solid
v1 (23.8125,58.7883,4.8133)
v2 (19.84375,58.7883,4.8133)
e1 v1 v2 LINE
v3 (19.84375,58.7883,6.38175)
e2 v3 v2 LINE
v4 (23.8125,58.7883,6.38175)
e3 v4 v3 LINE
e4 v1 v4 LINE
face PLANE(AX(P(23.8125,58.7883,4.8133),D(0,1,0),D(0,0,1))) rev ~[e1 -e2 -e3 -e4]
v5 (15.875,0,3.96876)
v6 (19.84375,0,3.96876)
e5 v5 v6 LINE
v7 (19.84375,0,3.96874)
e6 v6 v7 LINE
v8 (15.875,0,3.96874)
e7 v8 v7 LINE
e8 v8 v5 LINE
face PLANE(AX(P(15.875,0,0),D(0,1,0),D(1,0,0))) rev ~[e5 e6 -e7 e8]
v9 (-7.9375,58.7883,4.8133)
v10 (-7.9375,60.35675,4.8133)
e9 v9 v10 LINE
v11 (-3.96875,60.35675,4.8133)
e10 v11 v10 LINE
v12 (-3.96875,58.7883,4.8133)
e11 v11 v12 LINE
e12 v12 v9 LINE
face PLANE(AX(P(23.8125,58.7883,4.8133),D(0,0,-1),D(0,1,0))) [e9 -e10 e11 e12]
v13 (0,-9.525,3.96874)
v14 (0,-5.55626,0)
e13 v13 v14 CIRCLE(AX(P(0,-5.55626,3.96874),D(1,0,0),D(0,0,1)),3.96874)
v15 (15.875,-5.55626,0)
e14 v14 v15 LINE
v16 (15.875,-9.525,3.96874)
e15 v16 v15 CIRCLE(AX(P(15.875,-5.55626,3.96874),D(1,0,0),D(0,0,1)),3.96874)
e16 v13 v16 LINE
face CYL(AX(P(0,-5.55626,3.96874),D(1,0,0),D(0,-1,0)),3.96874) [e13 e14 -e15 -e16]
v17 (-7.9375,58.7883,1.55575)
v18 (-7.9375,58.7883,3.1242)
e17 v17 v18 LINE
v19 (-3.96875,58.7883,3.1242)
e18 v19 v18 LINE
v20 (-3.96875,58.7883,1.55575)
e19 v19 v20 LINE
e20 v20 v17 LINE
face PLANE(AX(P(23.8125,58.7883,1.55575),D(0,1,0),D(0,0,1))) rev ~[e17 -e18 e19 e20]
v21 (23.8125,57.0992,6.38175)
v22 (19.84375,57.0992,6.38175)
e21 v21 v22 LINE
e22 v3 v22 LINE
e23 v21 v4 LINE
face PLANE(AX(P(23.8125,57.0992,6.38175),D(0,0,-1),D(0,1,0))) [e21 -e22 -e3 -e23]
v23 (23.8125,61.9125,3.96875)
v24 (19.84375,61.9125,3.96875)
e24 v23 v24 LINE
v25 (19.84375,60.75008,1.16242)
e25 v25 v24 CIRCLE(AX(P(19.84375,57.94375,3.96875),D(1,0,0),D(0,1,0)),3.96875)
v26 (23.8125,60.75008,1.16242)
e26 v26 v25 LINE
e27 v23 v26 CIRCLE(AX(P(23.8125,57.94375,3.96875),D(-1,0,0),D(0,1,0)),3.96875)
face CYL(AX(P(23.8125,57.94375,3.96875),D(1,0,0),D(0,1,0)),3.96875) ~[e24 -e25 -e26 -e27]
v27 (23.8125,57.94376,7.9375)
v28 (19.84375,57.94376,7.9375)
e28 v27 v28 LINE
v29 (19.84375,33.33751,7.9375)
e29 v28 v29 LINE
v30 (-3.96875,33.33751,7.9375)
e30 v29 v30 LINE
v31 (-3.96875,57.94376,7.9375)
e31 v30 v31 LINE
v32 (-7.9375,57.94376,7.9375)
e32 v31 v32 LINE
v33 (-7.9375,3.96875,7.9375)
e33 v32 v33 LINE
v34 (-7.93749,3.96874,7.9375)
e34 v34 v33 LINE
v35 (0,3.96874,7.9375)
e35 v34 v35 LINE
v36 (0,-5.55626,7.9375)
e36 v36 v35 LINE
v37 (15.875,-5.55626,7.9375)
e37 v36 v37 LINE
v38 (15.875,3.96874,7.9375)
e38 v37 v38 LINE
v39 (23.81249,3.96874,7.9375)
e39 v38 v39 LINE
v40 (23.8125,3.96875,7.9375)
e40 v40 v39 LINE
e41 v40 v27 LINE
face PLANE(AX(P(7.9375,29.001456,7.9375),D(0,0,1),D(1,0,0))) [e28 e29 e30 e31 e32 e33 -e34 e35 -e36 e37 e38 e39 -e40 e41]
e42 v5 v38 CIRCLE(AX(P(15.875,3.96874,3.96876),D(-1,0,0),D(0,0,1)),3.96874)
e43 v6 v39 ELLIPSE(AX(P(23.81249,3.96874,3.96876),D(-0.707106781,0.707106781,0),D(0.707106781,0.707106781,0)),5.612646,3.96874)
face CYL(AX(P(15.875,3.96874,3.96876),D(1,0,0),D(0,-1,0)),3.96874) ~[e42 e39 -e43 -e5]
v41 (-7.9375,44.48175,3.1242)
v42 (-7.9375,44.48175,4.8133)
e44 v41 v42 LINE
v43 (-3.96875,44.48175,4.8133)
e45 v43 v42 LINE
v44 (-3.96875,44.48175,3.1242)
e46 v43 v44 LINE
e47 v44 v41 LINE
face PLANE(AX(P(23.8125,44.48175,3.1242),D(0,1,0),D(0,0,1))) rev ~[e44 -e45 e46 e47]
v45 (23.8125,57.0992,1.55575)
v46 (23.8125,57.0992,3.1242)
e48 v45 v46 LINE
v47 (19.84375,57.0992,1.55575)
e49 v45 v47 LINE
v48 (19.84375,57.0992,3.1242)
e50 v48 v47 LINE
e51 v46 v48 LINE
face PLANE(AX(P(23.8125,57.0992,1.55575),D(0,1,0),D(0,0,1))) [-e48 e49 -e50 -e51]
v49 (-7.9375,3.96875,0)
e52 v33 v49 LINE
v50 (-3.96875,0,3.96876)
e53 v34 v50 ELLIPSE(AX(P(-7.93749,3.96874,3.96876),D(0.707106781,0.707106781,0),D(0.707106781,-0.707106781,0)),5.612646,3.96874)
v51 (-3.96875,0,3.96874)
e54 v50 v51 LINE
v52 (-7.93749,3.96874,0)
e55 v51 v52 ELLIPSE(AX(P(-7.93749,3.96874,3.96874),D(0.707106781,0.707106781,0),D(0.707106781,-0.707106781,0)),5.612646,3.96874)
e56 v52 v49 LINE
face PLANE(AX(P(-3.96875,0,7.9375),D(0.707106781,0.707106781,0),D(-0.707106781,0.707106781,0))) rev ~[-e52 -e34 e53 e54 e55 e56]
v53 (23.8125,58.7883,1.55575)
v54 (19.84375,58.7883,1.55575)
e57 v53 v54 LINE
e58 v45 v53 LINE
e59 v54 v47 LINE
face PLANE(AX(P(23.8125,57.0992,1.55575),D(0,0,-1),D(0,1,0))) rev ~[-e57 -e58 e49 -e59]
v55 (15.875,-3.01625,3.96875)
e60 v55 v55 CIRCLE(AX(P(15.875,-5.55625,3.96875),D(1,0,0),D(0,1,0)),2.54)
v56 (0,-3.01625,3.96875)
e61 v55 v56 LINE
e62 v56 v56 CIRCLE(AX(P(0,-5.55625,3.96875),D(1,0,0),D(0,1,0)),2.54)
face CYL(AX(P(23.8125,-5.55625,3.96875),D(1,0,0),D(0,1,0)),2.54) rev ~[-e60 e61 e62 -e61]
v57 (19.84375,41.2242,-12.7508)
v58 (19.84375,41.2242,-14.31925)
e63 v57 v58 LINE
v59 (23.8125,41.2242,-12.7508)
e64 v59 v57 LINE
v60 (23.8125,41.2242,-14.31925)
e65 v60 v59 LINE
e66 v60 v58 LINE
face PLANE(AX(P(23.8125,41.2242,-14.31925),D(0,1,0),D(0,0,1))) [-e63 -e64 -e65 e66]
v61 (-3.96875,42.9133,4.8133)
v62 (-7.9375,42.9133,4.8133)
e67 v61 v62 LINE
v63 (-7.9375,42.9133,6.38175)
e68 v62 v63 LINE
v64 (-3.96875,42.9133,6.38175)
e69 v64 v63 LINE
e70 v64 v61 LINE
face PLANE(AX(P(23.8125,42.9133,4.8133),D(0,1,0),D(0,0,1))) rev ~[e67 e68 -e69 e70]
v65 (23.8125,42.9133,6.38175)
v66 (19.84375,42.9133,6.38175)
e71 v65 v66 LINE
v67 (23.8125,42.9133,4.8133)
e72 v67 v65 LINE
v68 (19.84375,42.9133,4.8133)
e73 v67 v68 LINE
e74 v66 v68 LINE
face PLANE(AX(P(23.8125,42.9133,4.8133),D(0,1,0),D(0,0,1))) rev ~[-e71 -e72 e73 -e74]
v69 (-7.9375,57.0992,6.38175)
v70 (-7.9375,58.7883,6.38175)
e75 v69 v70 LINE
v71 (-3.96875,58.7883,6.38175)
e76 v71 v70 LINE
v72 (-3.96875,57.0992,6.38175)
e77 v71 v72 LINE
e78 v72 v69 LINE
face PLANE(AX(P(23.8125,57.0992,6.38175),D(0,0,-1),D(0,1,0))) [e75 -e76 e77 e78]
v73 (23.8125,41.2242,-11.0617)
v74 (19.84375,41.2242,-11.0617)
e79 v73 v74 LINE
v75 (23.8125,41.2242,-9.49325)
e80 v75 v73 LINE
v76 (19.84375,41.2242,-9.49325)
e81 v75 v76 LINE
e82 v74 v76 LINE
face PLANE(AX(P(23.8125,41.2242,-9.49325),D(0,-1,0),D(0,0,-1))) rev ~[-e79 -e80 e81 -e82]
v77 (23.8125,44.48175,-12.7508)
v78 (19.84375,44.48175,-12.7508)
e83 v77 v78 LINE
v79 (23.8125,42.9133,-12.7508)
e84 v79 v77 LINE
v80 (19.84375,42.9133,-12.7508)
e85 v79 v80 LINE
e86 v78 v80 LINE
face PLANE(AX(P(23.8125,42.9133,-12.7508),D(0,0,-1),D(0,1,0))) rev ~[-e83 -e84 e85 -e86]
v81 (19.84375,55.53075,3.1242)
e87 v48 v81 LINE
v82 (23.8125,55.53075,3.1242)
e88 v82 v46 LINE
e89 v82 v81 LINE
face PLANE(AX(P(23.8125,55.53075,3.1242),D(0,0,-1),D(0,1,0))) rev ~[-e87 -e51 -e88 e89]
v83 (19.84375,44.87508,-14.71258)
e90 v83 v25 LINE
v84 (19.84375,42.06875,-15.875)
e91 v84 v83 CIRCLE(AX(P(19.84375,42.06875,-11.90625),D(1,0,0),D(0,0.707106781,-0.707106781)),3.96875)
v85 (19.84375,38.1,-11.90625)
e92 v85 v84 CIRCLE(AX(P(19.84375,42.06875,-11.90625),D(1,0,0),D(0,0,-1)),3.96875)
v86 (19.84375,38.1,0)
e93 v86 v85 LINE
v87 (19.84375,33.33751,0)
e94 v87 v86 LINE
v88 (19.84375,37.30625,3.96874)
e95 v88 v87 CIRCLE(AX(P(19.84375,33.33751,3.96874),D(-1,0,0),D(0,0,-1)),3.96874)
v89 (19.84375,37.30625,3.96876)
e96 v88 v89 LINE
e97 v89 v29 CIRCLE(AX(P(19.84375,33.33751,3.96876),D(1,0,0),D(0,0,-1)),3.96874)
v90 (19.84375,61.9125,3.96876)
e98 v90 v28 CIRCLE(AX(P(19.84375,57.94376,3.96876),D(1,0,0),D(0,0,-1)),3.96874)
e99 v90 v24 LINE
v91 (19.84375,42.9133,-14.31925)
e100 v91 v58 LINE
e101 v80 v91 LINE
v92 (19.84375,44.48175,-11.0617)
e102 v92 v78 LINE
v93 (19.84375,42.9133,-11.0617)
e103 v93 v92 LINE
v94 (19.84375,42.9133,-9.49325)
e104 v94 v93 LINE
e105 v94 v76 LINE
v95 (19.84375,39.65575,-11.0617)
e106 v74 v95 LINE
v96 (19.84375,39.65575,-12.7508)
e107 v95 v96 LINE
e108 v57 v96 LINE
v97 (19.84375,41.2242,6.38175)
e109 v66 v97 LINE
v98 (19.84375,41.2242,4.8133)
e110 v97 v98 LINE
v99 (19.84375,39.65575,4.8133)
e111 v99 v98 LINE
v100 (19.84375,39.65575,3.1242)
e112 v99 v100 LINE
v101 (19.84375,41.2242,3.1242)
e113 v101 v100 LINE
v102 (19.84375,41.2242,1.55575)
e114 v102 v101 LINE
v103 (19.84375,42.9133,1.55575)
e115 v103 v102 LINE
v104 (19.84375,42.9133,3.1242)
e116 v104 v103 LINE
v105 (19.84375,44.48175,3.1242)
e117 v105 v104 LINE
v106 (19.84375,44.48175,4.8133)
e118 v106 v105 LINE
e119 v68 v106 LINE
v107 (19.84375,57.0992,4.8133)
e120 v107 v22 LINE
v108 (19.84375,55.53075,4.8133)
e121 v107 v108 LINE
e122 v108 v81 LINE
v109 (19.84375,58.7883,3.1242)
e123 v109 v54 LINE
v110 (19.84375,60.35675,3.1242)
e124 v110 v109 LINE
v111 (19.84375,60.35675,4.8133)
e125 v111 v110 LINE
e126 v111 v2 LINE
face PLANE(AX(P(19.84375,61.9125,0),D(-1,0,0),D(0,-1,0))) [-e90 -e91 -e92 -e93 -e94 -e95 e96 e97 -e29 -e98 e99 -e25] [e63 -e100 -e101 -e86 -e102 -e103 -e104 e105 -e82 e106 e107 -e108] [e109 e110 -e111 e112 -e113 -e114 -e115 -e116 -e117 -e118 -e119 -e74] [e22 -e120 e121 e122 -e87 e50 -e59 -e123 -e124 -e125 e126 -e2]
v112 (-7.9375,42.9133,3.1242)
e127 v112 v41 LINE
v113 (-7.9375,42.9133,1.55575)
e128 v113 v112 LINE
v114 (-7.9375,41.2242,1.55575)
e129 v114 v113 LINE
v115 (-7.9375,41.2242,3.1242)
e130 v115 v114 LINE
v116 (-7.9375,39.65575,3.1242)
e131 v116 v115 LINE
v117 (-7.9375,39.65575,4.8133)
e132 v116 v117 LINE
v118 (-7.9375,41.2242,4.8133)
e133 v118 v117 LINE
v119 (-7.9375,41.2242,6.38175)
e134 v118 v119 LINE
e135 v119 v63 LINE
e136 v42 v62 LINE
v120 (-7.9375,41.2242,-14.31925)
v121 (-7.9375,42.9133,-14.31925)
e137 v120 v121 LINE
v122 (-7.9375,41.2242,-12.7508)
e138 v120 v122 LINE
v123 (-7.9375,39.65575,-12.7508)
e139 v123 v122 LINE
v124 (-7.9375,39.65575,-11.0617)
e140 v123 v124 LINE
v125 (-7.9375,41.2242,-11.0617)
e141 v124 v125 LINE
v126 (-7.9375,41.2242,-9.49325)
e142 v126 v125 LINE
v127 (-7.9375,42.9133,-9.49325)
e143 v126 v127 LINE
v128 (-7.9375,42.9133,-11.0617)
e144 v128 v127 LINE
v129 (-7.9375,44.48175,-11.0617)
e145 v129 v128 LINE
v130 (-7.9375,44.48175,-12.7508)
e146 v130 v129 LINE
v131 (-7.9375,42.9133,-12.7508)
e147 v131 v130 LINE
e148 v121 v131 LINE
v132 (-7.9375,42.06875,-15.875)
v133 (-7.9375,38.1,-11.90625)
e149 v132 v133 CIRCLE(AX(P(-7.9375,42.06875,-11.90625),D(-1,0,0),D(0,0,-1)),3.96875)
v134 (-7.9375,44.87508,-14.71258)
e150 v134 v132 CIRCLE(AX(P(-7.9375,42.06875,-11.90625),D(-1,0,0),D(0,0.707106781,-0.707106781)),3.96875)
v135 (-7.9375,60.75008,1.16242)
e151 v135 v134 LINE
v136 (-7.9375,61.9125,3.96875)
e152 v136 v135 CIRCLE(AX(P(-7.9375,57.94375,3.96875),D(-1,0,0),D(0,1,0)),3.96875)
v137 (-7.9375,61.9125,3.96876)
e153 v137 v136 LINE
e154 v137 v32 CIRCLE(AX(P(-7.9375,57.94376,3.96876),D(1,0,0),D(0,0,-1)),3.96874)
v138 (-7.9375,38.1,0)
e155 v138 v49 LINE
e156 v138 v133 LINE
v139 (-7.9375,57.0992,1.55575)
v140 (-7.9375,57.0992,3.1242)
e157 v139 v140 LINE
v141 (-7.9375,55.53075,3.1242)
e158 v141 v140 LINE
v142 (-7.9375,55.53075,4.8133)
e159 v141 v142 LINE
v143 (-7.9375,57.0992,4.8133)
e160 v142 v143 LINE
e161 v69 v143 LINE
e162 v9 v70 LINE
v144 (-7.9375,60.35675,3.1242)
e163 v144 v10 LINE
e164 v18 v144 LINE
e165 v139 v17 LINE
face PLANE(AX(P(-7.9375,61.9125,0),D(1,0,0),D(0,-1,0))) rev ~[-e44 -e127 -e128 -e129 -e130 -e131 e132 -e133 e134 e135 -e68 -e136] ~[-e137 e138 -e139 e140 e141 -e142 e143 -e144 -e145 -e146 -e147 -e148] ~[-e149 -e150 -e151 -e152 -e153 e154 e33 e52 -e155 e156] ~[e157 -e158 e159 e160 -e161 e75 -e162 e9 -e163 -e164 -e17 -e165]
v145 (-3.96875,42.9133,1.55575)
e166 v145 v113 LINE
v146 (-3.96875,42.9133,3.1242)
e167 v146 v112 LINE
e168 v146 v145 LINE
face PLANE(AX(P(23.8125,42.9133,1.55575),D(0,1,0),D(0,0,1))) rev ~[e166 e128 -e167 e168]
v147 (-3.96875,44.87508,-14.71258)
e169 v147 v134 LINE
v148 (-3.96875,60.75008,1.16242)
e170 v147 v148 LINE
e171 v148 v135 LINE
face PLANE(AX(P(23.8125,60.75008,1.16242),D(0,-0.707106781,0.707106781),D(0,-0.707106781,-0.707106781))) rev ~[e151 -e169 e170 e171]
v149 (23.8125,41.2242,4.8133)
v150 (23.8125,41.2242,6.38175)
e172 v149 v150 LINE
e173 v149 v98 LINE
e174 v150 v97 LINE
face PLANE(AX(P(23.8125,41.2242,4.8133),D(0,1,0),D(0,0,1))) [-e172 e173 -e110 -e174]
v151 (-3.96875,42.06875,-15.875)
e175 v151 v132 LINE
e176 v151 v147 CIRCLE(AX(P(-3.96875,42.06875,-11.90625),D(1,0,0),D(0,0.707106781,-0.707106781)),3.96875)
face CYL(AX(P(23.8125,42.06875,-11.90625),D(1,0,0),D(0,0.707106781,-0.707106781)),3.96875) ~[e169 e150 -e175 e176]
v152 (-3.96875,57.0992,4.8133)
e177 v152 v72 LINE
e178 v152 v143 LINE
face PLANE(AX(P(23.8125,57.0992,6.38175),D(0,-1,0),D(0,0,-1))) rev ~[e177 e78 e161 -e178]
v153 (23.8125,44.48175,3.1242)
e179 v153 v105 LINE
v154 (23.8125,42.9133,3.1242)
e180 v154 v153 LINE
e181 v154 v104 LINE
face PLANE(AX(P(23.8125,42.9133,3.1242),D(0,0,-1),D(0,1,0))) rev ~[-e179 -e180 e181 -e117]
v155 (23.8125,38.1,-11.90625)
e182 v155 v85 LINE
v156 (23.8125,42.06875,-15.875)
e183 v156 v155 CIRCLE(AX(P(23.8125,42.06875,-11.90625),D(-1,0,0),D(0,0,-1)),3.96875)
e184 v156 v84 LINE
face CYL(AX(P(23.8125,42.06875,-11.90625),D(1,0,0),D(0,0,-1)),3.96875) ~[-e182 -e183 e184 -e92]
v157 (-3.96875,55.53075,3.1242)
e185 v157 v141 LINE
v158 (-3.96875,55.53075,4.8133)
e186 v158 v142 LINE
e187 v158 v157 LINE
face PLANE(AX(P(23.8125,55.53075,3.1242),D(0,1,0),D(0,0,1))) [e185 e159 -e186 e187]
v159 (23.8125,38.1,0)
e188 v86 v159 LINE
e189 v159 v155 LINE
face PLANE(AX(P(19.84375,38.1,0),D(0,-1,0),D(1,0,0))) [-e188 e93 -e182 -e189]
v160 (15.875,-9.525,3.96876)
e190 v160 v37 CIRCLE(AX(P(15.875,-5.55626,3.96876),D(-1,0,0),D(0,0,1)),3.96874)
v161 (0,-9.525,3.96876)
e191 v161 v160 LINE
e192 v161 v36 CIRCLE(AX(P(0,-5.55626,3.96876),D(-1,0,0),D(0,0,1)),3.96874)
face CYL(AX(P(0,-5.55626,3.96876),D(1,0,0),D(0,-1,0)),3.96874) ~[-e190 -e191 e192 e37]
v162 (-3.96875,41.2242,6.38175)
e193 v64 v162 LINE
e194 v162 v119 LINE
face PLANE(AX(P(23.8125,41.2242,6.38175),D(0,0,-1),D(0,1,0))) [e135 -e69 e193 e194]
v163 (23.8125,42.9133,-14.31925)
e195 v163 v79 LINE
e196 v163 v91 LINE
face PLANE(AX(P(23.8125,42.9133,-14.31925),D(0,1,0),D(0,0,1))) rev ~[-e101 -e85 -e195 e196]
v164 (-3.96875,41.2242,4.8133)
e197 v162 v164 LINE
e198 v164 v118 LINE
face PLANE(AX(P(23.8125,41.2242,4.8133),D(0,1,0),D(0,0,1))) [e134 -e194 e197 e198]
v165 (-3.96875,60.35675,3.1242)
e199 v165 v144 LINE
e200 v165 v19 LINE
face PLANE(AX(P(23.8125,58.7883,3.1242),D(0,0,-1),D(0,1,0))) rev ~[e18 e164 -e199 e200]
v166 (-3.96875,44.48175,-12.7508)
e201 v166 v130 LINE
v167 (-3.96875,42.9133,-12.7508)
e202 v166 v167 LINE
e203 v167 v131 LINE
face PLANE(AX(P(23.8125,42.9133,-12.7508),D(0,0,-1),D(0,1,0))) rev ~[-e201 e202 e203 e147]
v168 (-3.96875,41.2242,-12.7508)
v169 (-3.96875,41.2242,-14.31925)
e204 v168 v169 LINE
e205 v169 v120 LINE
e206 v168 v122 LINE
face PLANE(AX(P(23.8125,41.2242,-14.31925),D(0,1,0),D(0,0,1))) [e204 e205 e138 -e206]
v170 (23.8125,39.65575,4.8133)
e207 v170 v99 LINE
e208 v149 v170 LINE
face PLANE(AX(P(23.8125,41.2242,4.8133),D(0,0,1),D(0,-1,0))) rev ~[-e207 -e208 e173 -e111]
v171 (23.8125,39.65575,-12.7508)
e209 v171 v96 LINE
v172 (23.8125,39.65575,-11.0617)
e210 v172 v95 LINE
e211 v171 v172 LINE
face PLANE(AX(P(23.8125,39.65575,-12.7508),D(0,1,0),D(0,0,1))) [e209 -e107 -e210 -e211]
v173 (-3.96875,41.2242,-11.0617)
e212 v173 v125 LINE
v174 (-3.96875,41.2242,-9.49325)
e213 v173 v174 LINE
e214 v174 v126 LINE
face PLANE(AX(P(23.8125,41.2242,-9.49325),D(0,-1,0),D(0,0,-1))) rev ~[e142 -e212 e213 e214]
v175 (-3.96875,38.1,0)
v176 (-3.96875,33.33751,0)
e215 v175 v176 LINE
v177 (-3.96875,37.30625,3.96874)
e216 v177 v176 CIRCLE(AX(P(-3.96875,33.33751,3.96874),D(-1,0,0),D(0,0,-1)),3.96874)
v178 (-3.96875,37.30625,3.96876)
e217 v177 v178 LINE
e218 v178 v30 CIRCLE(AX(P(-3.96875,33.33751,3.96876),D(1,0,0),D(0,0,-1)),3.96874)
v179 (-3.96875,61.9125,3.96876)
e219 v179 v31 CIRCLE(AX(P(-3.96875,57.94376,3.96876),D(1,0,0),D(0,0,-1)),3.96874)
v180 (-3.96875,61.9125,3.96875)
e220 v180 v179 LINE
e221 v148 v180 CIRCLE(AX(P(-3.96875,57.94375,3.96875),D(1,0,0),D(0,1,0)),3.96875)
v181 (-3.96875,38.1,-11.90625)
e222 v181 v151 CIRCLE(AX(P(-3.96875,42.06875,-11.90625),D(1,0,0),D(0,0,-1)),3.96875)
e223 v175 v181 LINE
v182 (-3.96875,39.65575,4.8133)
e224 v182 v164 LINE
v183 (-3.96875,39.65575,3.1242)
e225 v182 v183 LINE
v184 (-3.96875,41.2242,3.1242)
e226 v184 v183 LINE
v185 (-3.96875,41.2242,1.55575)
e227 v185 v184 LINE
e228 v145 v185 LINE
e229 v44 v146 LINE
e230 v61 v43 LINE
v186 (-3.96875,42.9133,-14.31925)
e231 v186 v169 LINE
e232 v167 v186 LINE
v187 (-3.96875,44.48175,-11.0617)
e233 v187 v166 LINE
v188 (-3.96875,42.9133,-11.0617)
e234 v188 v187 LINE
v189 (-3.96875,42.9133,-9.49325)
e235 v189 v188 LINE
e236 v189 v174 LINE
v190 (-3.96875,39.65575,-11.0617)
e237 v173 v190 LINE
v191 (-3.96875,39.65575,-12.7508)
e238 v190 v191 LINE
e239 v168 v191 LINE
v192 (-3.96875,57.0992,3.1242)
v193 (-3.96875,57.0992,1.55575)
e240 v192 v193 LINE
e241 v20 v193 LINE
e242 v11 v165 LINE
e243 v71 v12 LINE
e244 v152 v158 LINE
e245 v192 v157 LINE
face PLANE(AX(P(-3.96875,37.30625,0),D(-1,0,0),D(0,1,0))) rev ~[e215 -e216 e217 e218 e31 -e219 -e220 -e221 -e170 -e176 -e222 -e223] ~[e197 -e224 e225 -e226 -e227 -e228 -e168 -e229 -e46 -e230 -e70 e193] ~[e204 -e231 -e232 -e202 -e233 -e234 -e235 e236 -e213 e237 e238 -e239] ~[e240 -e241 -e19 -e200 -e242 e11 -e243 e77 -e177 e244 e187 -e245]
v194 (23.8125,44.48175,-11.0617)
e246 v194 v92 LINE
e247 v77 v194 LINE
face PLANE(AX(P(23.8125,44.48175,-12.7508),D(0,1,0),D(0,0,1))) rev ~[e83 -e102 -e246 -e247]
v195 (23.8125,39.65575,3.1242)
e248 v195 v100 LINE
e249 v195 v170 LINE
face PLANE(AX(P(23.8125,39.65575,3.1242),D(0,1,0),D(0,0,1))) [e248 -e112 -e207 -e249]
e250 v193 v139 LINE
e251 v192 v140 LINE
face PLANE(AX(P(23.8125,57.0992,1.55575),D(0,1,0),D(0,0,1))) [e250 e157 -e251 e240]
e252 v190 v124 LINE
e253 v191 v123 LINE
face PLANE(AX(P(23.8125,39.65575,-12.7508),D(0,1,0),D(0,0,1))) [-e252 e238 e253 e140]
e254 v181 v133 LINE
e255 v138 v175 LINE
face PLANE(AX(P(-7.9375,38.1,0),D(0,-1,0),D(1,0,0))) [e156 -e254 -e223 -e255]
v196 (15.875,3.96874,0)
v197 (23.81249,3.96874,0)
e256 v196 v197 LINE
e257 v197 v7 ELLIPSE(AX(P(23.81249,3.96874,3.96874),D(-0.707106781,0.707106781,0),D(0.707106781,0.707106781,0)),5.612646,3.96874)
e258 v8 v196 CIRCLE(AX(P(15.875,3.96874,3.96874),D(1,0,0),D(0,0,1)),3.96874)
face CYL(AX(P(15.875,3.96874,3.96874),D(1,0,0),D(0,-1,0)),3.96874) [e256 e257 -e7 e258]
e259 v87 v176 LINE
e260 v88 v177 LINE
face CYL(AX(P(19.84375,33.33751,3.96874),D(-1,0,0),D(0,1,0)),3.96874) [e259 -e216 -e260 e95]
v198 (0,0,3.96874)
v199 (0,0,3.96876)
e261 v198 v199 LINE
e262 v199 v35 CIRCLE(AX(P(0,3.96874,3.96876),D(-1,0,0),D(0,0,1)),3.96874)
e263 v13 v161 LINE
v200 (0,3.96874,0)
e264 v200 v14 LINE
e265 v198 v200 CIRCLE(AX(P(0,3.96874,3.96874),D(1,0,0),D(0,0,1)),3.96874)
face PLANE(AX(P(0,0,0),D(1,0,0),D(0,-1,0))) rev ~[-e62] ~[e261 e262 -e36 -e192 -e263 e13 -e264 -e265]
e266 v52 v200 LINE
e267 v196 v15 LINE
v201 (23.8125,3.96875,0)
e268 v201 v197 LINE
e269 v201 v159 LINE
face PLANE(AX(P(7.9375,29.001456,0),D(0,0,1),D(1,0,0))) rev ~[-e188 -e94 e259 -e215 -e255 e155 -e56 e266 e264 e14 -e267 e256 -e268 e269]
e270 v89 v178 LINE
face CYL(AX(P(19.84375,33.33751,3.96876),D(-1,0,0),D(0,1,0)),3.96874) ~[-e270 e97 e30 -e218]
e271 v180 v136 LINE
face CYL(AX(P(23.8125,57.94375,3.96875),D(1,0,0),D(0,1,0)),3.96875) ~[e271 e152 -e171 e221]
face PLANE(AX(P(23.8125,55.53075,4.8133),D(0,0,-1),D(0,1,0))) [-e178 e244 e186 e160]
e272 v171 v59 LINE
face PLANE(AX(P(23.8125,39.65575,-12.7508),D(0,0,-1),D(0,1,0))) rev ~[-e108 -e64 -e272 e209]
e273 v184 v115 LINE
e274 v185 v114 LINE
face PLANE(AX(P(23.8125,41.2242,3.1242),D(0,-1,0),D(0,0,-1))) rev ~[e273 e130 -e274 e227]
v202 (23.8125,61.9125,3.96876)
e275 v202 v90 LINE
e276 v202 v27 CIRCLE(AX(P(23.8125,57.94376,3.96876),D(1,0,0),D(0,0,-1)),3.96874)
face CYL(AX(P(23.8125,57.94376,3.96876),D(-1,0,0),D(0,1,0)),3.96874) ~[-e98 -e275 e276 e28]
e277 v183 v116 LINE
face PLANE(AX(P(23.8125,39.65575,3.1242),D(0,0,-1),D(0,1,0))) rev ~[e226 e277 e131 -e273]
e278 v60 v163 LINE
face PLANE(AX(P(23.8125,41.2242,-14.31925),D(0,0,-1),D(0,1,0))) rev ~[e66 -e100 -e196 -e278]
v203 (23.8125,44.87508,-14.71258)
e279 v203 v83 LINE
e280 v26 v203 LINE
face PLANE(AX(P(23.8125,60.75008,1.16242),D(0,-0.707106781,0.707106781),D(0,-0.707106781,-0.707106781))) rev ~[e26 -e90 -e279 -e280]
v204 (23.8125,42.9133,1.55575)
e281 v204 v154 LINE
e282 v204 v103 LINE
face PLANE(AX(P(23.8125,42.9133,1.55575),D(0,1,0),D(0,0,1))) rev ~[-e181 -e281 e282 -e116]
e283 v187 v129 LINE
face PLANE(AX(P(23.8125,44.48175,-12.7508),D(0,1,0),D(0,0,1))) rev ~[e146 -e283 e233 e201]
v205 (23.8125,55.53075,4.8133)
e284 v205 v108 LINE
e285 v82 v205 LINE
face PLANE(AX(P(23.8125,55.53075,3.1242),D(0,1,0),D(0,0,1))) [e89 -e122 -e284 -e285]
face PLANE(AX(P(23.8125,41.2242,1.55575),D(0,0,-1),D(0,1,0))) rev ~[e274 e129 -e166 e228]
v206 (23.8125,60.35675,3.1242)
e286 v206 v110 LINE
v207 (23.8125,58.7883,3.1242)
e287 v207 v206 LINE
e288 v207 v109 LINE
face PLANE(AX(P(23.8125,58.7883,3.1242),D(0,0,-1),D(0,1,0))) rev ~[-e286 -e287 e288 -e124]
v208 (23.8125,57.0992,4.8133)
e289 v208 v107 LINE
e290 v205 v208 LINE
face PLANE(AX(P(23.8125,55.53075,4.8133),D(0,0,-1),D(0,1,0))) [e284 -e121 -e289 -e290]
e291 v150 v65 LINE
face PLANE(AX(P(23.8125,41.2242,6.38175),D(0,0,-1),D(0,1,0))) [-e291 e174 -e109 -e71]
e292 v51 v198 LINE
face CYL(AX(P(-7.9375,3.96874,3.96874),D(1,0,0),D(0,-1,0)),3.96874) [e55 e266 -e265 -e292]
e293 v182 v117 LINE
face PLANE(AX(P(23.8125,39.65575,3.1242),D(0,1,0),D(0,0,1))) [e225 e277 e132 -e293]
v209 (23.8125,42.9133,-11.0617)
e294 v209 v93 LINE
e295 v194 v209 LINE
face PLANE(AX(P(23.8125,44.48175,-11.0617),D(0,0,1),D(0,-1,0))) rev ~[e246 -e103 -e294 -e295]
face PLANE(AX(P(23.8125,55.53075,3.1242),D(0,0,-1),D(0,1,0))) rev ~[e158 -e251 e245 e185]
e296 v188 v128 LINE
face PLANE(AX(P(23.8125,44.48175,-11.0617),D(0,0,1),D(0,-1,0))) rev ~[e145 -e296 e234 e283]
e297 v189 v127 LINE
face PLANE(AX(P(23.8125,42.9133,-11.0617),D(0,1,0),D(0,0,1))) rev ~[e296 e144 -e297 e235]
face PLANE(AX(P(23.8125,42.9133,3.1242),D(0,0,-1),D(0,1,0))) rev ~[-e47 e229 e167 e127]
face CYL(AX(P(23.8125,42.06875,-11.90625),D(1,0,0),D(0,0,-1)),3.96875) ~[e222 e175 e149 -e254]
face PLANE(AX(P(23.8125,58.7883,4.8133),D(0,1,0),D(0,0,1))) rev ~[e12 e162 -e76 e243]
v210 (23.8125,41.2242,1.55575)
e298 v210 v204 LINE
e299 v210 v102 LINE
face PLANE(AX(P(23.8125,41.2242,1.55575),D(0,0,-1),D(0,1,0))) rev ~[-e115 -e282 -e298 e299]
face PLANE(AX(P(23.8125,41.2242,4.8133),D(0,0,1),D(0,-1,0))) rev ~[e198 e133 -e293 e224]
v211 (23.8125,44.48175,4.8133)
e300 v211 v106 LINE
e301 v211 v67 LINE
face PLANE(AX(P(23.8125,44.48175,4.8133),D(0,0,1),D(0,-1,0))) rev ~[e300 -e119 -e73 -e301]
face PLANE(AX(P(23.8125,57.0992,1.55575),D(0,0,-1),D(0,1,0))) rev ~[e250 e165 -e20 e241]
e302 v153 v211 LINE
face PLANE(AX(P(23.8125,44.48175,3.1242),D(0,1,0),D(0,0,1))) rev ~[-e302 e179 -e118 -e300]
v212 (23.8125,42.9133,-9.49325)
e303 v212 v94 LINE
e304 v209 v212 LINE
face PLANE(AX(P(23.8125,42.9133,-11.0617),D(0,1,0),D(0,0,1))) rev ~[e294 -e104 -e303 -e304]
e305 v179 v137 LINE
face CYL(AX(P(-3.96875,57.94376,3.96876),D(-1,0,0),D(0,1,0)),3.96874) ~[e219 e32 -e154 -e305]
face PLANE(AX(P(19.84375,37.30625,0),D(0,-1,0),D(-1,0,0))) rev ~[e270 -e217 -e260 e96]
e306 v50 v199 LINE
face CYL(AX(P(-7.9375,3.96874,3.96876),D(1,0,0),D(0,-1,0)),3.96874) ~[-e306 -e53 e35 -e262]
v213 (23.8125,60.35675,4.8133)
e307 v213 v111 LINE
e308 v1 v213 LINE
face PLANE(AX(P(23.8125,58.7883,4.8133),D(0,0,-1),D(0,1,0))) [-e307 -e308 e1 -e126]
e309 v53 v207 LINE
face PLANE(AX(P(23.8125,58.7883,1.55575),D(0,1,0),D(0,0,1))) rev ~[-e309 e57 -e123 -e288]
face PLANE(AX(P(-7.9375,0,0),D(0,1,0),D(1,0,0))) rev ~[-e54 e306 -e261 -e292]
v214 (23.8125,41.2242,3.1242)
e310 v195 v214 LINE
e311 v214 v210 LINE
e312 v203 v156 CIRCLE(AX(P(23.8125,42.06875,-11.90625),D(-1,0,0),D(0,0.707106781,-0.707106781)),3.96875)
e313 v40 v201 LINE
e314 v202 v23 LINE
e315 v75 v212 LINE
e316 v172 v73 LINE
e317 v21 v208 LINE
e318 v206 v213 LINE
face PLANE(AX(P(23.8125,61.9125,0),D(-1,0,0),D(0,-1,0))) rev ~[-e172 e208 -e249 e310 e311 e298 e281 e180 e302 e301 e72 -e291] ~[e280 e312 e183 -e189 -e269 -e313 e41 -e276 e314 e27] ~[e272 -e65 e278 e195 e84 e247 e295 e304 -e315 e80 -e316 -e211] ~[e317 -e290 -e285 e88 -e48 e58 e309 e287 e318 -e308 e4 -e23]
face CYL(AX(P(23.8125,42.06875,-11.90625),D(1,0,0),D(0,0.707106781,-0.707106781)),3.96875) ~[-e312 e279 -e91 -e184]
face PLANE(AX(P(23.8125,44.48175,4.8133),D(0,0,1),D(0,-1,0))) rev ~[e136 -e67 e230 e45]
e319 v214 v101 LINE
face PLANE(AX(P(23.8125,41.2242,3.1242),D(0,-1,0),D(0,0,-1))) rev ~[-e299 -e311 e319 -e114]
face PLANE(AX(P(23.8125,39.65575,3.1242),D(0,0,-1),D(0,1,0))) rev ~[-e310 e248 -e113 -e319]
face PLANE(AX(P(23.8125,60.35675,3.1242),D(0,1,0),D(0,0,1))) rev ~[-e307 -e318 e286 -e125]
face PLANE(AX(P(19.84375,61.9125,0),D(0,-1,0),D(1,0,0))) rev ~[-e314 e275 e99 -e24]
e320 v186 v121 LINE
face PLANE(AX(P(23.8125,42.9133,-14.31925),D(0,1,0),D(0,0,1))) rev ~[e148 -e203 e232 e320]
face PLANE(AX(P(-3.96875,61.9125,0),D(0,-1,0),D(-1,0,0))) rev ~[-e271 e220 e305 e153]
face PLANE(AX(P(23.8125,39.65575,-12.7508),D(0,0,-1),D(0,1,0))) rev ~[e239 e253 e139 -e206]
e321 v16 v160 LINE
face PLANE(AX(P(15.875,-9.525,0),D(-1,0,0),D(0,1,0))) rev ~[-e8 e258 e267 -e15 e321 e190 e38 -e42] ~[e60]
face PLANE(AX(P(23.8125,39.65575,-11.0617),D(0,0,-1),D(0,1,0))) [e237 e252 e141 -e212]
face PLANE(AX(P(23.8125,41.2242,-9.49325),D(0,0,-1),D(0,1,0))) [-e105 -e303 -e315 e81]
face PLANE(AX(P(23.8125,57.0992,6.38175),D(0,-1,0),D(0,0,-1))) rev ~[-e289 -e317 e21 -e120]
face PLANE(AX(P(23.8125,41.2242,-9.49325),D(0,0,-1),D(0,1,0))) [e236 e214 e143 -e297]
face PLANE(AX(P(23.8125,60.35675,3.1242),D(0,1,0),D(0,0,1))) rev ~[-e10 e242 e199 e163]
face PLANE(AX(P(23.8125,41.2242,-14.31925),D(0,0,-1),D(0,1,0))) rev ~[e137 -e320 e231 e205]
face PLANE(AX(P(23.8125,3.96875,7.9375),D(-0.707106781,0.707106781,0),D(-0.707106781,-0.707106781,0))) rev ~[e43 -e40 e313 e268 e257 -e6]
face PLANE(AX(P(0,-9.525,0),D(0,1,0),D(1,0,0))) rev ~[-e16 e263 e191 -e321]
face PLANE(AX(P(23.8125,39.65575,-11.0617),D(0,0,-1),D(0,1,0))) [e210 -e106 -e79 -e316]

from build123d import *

# Parameters (mm, degrees)
F1_DEPTH = 7.9375
F2_R     = 3.96874
F3_W     = 3.96875
F3_H     = 23.8125
F4_DEPTH = 15.875
F5_W     = 1.56845
F5_H     = 1.6891
F5_W_2   = 1.6891
F5_H_2   = 1.56845
F5_R     = 2.54
F6_DEPTH = 31.75
F8_DEPTH = 7.9375


# Not quite as in the source:
# - a fillet or chamfer is up to 0.001 mm smaller than in the source, because OpenCascade refuses the exact size


with BuildPart() as f1:
    # F0 (on Top) → F1 (new body)
    with BuildSketch(Plane.XY):
        Polygon((0, 0), (0, -9.525), (15.875, -9.525), (15.875, 0), (23.8125, 0), (23.8125, 61.9125), (19.84375, 61.9125), (19.84375, 37.30625), (-3.96875, 37.30625), (-3.96875, 61.9125), (-7.9375, 61.9125), (-7.9375, 0), align=None)
    extrude(amount=F1_DEPTH)

    # F2 (radius 3.96875 in the source; OpenCascade refuses exactly that, so slightly less here)
    f2_edges = [f1.edges().sort_by_distance(p)[0] for p in [
        (19.84375, 0, 7.9375),
        (19.84375, 0, 0),
        (7.9375, -9.525, 0),
        (7.9375, -9.525, 7.9375),
        (-3.96875, 0, 7.9375),
        (-3.96875, 0, 0),
        (-5.953125, 61.9125, 7.9375),
        (7.9375, 37.30625, 0),
        (7.9375, 37.30625, 7.9375),
        (21.828125, 61.9125, 7.9375),
    ]]
    fillet(f2_edges, radius=F2_R)

    # F3 (on face) → F4 (join)
    with BuildSketch(Plane(origin=(0, 0, 0), x_dir=(1, 0, 0), z_dir=(0, 0, -1))):
        with Locations((21.828125, -50.00625)):
            Rectangle(F3_W, F3_H)
        with Locations((-5.953125, -50.00625)):
            Rectangle(F3_W, F3_H)
    extrude(amount=F4_DEPTH)

    # F5 (on face) → F6 (cut, through all)
    with BuildSketch(Plane.YZ.offset(23.8125)):
        with BuildLine():
            Line((38.1, -15.875), (42.06875, -15.875))
            ThreePointArc((42.06875, -15.875), (39.2624199622, -14.7125800378), (38.1, -11.90625))
            Line((38.1, -11.90625), (38.1, -15.875))
        make_face()
        with BuildLine():
            Line((42.06875, -15.875), (61.9125, -15.875))
            Line((61.9125, -15.875), (61.9125, 3.96875))
            ThreePointArc((61.9125, 3.96875), (61.6103968947, 2.4499751278), (60.7500800378, 1.1624199622))
            Line((60.7500800378, 1.1624199622), (44.8750800378, -14.7125800378))
            ThreePointArc((44.8750800378, -14.7125800378), (43.5875248722, -15.5728968947), (42.06875, -15.875))
        make_face()
        with Locations((43.697525, -11.90625)):
            Rectangle(F5_W, F5_H)
        with Locations((42.06875, -11.90625)):
            Rectangle(F5_W_2, F5_H)
        with Locations((42.06875, -10.277475)):
            Rectangle(F5_W_2, F5_H_2)
        with Locations((40.439975, -11.90625)):
            Rectangle(F5_W, F5_H)
        with Locations((42.06875, -13.535025)):
            Rectangle(F5_W_2, F5_H_2)
        with Locations((57.94375, 5.597525)):
            Rectangle(F5_W_2, F5_H_2)
        with Locations((57.94375, 3.96875)):
            Rectangle(F5_W_2, F5_H)
        with Locations((56.314975, 3.96875)):
            Rectangle(F5_W, F5_H)
        with Locations((59.572525, 3.96875)):
            Rectangle(F5_W, F5_H)
        with Locations((57.94375, 2.339975)):
            Rectangle(F5_W_2, F5_H_2)
        with Locations((42.06875, 2.339975)):
            Rectangle(F5_W_2, F5_H_2)
        with Locations((42.06875, 3.96875)):
            Rectangle(F5_W_2, F5_H)
        with Locations((43.697525, 3.96875)):
            Rectangle(F5_W, F5_H)
        with Locations((40.439975, 3.96875)):
            Rectangle(F5_W, F5_H)
        with Locations((42.06875, 5.597525)):
            Rectangle(F5_W_2, F5_H_2)
        with Locations((-5.55625, 3.96875)):
            Circle(F5_R)
    extrude(amount=-F6_DEPTH, mode=Mode.SUBTRACT)

    # F7 (on face) → F8 (cut, through all)
    with BuildSketch(Plane.XY.offset(7.9375)):
        Polygon((19.84375, 0), (23.8125, 0), (23.8125, 3.96875), align=None)
        Polygon((-7.9375, 3.96875), (-7.9375, 0), (-3.96875, 0), align=None)
    extrude(amount=-F8_DEPTH, mode=Mode.SUBTRACT)


solid = f1.part
